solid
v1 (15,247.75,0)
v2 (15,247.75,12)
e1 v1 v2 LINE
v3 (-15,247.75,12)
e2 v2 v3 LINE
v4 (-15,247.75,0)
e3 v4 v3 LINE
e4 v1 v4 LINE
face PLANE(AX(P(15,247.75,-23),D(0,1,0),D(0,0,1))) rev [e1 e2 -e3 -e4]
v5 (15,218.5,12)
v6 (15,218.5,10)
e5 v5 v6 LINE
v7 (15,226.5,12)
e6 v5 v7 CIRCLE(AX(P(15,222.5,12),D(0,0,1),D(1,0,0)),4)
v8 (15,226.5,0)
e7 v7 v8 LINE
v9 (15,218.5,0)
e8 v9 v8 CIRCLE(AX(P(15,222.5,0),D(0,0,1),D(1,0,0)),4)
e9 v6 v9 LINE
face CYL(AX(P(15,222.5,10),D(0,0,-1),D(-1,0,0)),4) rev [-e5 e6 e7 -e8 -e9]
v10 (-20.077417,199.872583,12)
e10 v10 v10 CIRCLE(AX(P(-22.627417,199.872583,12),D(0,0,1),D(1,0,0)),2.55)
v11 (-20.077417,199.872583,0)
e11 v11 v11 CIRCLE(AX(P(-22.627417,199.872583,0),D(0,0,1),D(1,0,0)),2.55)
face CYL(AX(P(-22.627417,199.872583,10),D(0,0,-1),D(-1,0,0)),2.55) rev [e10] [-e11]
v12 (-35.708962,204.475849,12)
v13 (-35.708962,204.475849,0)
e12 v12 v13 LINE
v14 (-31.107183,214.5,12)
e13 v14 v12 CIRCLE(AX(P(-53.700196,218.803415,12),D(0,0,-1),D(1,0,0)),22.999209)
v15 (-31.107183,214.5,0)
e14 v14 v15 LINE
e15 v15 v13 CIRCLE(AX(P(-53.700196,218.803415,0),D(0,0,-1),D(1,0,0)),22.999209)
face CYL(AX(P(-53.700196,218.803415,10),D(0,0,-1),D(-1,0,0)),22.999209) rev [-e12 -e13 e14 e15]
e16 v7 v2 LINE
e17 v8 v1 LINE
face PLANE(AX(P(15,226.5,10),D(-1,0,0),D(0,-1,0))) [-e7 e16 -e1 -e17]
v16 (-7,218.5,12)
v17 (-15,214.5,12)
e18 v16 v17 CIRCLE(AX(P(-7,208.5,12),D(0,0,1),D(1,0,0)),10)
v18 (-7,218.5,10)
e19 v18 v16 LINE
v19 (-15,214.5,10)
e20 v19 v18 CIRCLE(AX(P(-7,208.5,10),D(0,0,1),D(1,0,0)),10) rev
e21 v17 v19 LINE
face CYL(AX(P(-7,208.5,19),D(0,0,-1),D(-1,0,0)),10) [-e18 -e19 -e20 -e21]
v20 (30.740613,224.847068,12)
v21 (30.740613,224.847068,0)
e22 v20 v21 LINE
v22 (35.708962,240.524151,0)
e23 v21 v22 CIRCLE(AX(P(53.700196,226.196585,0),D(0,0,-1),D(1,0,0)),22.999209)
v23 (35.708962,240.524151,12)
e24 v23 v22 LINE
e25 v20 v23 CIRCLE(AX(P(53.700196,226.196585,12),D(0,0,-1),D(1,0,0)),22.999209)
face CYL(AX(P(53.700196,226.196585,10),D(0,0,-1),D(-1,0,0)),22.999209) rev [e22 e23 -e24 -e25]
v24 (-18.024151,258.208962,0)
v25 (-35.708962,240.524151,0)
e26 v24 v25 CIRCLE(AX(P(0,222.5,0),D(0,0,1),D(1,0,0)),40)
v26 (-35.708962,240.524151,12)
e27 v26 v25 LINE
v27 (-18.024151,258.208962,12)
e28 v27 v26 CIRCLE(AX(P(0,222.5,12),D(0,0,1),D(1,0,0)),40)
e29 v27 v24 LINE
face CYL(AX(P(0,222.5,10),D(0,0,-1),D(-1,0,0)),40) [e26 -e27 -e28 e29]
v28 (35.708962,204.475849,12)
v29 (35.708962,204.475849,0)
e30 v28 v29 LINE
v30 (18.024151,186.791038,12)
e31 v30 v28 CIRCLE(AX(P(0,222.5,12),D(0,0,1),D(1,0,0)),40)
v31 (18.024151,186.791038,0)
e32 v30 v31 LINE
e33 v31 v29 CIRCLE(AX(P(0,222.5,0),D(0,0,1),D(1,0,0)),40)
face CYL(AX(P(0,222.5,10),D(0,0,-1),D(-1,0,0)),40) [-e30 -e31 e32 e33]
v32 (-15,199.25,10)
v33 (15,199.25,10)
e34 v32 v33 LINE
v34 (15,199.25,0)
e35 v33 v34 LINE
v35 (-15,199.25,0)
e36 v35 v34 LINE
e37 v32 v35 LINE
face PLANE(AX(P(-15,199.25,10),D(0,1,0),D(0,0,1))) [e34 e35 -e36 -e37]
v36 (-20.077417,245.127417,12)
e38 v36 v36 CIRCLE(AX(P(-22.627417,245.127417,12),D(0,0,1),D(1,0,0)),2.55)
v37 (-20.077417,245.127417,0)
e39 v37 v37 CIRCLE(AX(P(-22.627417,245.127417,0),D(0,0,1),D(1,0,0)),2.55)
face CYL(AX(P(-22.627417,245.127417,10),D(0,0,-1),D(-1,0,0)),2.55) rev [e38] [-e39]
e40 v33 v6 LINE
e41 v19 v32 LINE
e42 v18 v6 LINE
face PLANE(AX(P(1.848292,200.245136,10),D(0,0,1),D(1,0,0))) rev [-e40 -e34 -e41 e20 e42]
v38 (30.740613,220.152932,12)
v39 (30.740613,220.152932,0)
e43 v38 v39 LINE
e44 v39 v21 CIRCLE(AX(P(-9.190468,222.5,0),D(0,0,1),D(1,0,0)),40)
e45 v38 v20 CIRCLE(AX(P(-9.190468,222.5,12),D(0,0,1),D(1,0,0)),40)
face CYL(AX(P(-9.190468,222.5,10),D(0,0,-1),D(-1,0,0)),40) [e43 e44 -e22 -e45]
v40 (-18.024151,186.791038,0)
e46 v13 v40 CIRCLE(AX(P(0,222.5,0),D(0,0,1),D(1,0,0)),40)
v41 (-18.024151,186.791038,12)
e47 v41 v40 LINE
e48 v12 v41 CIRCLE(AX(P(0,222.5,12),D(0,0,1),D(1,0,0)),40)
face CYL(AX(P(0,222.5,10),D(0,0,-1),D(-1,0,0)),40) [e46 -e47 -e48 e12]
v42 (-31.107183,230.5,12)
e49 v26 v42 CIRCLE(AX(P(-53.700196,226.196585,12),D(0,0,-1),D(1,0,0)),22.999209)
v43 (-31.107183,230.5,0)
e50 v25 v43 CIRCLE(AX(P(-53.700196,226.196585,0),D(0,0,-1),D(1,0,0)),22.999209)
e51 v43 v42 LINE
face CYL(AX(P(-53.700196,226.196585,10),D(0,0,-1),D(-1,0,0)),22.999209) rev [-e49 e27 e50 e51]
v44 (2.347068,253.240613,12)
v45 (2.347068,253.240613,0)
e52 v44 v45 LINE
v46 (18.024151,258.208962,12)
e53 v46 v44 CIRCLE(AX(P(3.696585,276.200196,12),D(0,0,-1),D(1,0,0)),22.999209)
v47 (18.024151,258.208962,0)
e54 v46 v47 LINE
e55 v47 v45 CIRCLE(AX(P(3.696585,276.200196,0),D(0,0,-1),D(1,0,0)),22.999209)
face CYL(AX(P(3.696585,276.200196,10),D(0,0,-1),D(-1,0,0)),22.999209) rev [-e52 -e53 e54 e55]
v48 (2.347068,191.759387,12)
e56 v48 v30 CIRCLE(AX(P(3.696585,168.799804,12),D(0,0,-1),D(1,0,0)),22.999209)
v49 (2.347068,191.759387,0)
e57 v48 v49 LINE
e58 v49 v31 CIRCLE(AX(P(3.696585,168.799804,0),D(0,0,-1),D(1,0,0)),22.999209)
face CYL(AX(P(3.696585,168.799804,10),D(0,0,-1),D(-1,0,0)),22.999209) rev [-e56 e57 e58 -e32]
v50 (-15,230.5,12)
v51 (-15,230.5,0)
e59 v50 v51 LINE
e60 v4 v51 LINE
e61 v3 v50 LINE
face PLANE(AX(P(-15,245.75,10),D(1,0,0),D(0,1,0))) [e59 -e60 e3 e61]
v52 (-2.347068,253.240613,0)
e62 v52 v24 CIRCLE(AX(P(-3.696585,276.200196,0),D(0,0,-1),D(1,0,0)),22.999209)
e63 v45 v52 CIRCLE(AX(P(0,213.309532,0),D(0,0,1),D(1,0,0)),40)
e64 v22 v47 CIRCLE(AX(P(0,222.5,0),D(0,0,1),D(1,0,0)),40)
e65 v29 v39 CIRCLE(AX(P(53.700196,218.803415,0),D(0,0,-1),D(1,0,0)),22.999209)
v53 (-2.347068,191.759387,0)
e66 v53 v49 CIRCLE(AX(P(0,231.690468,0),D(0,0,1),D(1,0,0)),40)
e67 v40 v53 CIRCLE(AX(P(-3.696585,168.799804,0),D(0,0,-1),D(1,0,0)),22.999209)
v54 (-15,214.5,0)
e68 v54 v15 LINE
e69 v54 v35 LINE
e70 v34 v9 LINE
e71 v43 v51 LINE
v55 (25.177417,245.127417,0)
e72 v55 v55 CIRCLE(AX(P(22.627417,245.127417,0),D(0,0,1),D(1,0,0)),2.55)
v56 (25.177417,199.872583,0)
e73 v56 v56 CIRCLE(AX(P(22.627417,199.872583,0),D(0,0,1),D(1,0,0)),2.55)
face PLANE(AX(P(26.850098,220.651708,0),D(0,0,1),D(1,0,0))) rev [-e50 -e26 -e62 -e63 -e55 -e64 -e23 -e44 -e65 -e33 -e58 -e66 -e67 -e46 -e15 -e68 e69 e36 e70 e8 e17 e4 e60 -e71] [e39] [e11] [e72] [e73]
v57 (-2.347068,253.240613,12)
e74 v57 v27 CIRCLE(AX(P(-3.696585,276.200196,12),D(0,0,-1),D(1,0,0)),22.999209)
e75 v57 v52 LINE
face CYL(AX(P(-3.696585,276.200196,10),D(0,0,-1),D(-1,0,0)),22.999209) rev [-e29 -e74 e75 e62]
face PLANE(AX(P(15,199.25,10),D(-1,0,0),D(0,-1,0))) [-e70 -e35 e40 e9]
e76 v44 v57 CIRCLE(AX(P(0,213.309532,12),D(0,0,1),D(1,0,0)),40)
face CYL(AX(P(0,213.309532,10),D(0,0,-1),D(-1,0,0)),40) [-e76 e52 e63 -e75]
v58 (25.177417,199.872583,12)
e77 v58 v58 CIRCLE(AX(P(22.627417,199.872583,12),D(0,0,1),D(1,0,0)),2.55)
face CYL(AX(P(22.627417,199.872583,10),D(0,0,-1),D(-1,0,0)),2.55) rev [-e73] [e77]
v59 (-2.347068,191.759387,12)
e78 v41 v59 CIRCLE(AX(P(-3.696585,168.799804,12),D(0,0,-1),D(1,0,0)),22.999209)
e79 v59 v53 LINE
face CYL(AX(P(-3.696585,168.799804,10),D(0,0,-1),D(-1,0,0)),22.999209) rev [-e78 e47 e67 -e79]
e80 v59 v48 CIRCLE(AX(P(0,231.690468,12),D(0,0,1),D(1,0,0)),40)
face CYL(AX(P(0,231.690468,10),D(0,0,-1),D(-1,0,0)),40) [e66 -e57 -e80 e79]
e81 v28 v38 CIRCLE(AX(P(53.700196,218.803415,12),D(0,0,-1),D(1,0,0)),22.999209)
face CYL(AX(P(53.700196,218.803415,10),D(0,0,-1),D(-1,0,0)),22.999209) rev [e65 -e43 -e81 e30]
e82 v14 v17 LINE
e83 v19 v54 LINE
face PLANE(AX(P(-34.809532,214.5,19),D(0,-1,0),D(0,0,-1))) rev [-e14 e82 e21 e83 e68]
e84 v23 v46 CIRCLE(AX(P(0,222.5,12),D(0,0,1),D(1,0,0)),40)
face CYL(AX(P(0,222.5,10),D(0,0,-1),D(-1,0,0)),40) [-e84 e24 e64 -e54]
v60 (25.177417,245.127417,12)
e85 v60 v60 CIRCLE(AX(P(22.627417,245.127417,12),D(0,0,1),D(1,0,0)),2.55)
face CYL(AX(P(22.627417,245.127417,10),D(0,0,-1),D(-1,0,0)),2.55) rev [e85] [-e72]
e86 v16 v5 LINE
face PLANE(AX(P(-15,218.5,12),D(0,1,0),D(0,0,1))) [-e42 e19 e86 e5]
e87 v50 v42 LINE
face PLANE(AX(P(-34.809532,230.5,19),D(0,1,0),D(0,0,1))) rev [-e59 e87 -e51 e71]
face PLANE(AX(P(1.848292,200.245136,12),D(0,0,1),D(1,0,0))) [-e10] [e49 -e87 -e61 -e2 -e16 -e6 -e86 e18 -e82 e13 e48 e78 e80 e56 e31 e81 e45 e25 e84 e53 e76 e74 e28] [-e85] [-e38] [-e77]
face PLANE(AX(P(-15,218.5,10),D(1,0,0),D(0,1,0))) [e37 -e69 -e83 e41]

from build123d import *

# Parameters (mm, degrees)
SKETCH1_R           = 2.55
BOSS_EXTRUDE2_DEPTH = 10
SKETCH2_R           = 2.55
BOSS_EXTRUDE3_DEPTH = 2
SKETCH3_W           = 30
SKETCH3_H           = 2
CUT_EXTRUDE1_DEPTH  = 35
SKETCH4_W           = 19.809531665
SKETCH4_H           = 16
CUT_EXTRUDE2_DEPTH  = 19
FILLET1_R           = 10


with BuildPart() as part:
    # Sketch1 → Boss-Extrude2 (new body)
    with BuildSketch(Plane.XY):
        with BuildLine():
            ThreePointArc((18.024150889, 186.79103775), (10.644862344, 190.724335457), (2.347067513, 191.759386777))
            ThreePointArc((2.347067513, 191.759386777), (0, 191.690468331), (-2.347067513, 191.759386777))
            ThreePointArc((-2.347067513, 191.759386777), (-10.644862344, 190.724335457), (-18.024150889, 186.79103775))
            ThreePointArc((-18.024150889, 186.79103775), (-28.284271247, 194.215728749), (-35.708962247, 204.475849108))
            ThreePointArc((-35.708962247, 204.475849108), (-31.77566454, 211.855137653), (-30.74061322, 220.152932484))
            ThreePointArc((-30.74061322, 220.152932484), (-30.809531665, 222.499999997), (-30.74061322, 224.84706751))
            ThreePointArc((-30.74061322, 224.84706751), (-31.77566454, 233.14486234), (-35.708962247, 240.524150885))
            ThreePointArc((-35.708962247, 240.524150885), (-28.284271247, 250.784271244), (-18.024150889, 258.208962244))
            ThreePointArc((-18.024150889, 258.208962244), (-10.644862344, 254.275664537), (-2.347067513, 253.240613217))
            ThreePointArc((-2.347067513, 253.240613217), (0, 253.309531662), (2.347067513, 253.240613217))
            ThreePointArc((2.347067513, 253.240613217), (10.644862344, 254.275664537), (18.024150889, 258.208962244))
            ThreePointArc((18.024150889, 258.208962244), (28.284271247, 250.784271244), (35.708962247, 240.524150885))
            ThreePointArc((35.708962247, 240.524150885), (31.77566454, 233.14486234), (30.74061322, 224.84706751))
            ThreePointArc((30.74061322, 224.84706751), (30.809531665, 222.499999997), (30.74061322, 220.152932484))
            ThreePointArc((30.74061322, 220.152932484), (31.77566454, 211.855137653), (35.708962247, 204.475849108))
            ThreePointArc((35.708962247, 204.475849108), (28.284271247, 194.215728749), (18.024150889, 186.79103775))
        make_face()
        with Locations((-22.627416998, 245.127416995)):
            Circle(SKETCH1_R, mode=Mode.SUBTRACT)
        with Locations((-22.627416998, 199.872582999)):
            Circle(SKETCH1_R, mode=Mode.SUBTRACT)
        with Locations((22.627416998, 199.872582999)):
            Circle(SKETCH1_R, mode=Mode.SUBTRACT)
        with Locations((22.627416998, 245.127416995)):
            Circle(SKETCH1_R, mode=Mode.SUBTRACT)
        with BuildLine():
            Line((-15, 218.499999997), (-15, 199.25))
            Line((-15, 199.25), (15, 199.25))
            Line((15, 199.25), (15, 218.499999997))
            ThreePointArc((15, 218.499999997), (19, 222.499999997), (15, 226.499999997))
            Line((15, 226.499999997), (15, 245.749999994))
            Line((15, 245.749999994), (-15, 245.749999994))
            Line((-15, 245.749999994), (-15, 226.499999997))
            ThreePointArc((-15, 226.499999997), (-19, 222.499999997), (-15, 218.499999997))
        make_face(mode=Mode.SUBTRACT)
    extrude(amount=BOSS_EXTRUDE2_DEPTH)

    # Sketch2 → Boss-Extrude3 (add)
    with BuildSketch(Plane.XY.offset(10)):
        with BuildLine():
            ThreePointArc((18.024150889, 186.79103775), (28.284271247, 194.215728749), (35.708962247, 204.475849108))
            ThreePointArc((35.708962247, 204.475849108), (31.77566454, 211.855137653), (30.74061322, 220.152932484))
            ThreePointArc((30.74061322, 220.152932484), (30.809531665, 222.499999997), (30.74061322, 224.84706751))
            ThreePointArc((30.74061322, 224.84706751), (31.77566454, 233.14486234), (35.708962247, 240.524150885))
            ThreePointArc((35.708962247, 240.524150885), (28.284271247, 250.784271244), (18.024150889, 258.208962244))
            ThreePointArc((18.024150889, 258.208962244), (10.644862344, 254.275664537), (2.347067513, 253.240613217))
            ThreePointArc((2.347067513, 253.240613217), (0, 253.309531662), (-2.347067513, 253.240613217))
            ThreePointArc((-2.347067513, 253.240613217), (-10.644862344, 254.275664537), (-18.024150889, 258.208962244))
            ThreePointArc((-18.024150889, 258.208962244), (-28.284271247, 250.784271244), (-35.708962247, 240.524150885))
            ThreePointArc((-35.708962247, 240.524150885), (-31.77566454, 233.14486234), (-30.74061322, 224.84706751))
            ThreePointArc((-30.74061322, 224.84706751), (-30.809531665, 222.499999997), (-30.74061322, 220.152932484))
            ThreePointArc((-30.74061322, 220.152932484), (-31.77566454, 211.855137653), (-35.708962247, 204.475849108))
            ThreePointArc((-35.708962247, 204.475849108), (-28.284271247, 194.215728749), (-18.024150889, 186.79103775))
            ThreePointArc((-18.024150889, 186.79103775), (-10.644862344, 190.724335457), (-2.347067513, 191.759386777))
            ThreePointArc((-2.347067513, 191.759386777), (0, 191.690468331), (2.347067513, 191.759386777))
            ThreePointArc((2.347067513, 191.759386777), (10.644862344, 190.724335457), (18.024150889, 186.79103775))
        make_face()
        with Locations((-22.627416998, 245.127416995)):
            Circle(SKETCH2_R, mode=Mode.SUBTRACT)
        with Locations((-22.627416998, 199.872582999)):
            Circle(SKETCH2_R, mode=Mode.SUBTRACT)
        with Locations((22.627416998, 199.872582999)):
            Circle(SKETCH2_R, mode=Mode.SUBTRACT)
        with Locations((22.627416998, 245.127416995)):
            Circle(SKETCH2_R, mode=Mode.SUBTRACT)
        with BuildLine():
            Line((-15, 245.749999994), (-15, 226.499999997))
            ThreePointArc((-15, 226.499999997), (-19, 222.499999997), (-15, 218.499999997))
            Line((-15, 218.499999997), (15, 218.499999997))
            ThreePointArc((15, 218.499999997), (19, 222.499999997), (15, 226.499999997))
            Line((15, 226.499999997), (15, 245.749999994))
            Line((15, 245.749999994), (-15, 245.749999994))
        make_face(mode=Mode.SUBTRACT)
    extrude(amount=BOSS_EXTRUDE3_DEPTH)

    # Sketch3 → Cut-Extrude1 (cut)
    with BuildSketch(Plane.XY.offset(12)):
        with Locations((0, 246.749999994)):
            Rectangle(SKETCH3_W, SKETCH3_H)
    extrude(amount=-CUT_EXTRUDE1_DEPTH, mode=Mode.SUBTRACT)

    # Sketch4 → Cut-Extrude2 (cut)
    with BuildSketch(Plane(origin=(0, 0, 0), x_dir=(-1, 0, 0), z_dir=(0, 0, -1))):
        with Locations((24.904765833, 222.499999997)):
            Rectangle(SKETCH4_W, SKETCH4_H)
    extrude(amount=-CUT_EXTRUDE2_DEPTH, mode=Mode.SUBTRACT)

    # Fillet1
    # the kernel refuses this fillet: 10 mm, written as the material it takes off along each edge
    with BuildSketch(Plane(origin=(-15, 218.499999997, -10), x_dir=(0, -1, 0), z_dir=(0, 0, 1))) as fillet1_piece_1:
        with BuildLine():
            CenterArc((10, 8), FILLET1_R, 180, 53.130102354)
            Line((0, 8), (-0.2, 8))
            Line((-0.2, 8), (-0.2, 0))
            Line((-0.2, 0), (0, -0.2))
            ThreePointArc((0, -0.2), (2, -0.2), (3.88, -0.16))
            Line((3.88, -0.16), (4, 0))
        make_face()
    extrude(amount=42, mode=Mode.SUBTRACT)


solid = part.part
